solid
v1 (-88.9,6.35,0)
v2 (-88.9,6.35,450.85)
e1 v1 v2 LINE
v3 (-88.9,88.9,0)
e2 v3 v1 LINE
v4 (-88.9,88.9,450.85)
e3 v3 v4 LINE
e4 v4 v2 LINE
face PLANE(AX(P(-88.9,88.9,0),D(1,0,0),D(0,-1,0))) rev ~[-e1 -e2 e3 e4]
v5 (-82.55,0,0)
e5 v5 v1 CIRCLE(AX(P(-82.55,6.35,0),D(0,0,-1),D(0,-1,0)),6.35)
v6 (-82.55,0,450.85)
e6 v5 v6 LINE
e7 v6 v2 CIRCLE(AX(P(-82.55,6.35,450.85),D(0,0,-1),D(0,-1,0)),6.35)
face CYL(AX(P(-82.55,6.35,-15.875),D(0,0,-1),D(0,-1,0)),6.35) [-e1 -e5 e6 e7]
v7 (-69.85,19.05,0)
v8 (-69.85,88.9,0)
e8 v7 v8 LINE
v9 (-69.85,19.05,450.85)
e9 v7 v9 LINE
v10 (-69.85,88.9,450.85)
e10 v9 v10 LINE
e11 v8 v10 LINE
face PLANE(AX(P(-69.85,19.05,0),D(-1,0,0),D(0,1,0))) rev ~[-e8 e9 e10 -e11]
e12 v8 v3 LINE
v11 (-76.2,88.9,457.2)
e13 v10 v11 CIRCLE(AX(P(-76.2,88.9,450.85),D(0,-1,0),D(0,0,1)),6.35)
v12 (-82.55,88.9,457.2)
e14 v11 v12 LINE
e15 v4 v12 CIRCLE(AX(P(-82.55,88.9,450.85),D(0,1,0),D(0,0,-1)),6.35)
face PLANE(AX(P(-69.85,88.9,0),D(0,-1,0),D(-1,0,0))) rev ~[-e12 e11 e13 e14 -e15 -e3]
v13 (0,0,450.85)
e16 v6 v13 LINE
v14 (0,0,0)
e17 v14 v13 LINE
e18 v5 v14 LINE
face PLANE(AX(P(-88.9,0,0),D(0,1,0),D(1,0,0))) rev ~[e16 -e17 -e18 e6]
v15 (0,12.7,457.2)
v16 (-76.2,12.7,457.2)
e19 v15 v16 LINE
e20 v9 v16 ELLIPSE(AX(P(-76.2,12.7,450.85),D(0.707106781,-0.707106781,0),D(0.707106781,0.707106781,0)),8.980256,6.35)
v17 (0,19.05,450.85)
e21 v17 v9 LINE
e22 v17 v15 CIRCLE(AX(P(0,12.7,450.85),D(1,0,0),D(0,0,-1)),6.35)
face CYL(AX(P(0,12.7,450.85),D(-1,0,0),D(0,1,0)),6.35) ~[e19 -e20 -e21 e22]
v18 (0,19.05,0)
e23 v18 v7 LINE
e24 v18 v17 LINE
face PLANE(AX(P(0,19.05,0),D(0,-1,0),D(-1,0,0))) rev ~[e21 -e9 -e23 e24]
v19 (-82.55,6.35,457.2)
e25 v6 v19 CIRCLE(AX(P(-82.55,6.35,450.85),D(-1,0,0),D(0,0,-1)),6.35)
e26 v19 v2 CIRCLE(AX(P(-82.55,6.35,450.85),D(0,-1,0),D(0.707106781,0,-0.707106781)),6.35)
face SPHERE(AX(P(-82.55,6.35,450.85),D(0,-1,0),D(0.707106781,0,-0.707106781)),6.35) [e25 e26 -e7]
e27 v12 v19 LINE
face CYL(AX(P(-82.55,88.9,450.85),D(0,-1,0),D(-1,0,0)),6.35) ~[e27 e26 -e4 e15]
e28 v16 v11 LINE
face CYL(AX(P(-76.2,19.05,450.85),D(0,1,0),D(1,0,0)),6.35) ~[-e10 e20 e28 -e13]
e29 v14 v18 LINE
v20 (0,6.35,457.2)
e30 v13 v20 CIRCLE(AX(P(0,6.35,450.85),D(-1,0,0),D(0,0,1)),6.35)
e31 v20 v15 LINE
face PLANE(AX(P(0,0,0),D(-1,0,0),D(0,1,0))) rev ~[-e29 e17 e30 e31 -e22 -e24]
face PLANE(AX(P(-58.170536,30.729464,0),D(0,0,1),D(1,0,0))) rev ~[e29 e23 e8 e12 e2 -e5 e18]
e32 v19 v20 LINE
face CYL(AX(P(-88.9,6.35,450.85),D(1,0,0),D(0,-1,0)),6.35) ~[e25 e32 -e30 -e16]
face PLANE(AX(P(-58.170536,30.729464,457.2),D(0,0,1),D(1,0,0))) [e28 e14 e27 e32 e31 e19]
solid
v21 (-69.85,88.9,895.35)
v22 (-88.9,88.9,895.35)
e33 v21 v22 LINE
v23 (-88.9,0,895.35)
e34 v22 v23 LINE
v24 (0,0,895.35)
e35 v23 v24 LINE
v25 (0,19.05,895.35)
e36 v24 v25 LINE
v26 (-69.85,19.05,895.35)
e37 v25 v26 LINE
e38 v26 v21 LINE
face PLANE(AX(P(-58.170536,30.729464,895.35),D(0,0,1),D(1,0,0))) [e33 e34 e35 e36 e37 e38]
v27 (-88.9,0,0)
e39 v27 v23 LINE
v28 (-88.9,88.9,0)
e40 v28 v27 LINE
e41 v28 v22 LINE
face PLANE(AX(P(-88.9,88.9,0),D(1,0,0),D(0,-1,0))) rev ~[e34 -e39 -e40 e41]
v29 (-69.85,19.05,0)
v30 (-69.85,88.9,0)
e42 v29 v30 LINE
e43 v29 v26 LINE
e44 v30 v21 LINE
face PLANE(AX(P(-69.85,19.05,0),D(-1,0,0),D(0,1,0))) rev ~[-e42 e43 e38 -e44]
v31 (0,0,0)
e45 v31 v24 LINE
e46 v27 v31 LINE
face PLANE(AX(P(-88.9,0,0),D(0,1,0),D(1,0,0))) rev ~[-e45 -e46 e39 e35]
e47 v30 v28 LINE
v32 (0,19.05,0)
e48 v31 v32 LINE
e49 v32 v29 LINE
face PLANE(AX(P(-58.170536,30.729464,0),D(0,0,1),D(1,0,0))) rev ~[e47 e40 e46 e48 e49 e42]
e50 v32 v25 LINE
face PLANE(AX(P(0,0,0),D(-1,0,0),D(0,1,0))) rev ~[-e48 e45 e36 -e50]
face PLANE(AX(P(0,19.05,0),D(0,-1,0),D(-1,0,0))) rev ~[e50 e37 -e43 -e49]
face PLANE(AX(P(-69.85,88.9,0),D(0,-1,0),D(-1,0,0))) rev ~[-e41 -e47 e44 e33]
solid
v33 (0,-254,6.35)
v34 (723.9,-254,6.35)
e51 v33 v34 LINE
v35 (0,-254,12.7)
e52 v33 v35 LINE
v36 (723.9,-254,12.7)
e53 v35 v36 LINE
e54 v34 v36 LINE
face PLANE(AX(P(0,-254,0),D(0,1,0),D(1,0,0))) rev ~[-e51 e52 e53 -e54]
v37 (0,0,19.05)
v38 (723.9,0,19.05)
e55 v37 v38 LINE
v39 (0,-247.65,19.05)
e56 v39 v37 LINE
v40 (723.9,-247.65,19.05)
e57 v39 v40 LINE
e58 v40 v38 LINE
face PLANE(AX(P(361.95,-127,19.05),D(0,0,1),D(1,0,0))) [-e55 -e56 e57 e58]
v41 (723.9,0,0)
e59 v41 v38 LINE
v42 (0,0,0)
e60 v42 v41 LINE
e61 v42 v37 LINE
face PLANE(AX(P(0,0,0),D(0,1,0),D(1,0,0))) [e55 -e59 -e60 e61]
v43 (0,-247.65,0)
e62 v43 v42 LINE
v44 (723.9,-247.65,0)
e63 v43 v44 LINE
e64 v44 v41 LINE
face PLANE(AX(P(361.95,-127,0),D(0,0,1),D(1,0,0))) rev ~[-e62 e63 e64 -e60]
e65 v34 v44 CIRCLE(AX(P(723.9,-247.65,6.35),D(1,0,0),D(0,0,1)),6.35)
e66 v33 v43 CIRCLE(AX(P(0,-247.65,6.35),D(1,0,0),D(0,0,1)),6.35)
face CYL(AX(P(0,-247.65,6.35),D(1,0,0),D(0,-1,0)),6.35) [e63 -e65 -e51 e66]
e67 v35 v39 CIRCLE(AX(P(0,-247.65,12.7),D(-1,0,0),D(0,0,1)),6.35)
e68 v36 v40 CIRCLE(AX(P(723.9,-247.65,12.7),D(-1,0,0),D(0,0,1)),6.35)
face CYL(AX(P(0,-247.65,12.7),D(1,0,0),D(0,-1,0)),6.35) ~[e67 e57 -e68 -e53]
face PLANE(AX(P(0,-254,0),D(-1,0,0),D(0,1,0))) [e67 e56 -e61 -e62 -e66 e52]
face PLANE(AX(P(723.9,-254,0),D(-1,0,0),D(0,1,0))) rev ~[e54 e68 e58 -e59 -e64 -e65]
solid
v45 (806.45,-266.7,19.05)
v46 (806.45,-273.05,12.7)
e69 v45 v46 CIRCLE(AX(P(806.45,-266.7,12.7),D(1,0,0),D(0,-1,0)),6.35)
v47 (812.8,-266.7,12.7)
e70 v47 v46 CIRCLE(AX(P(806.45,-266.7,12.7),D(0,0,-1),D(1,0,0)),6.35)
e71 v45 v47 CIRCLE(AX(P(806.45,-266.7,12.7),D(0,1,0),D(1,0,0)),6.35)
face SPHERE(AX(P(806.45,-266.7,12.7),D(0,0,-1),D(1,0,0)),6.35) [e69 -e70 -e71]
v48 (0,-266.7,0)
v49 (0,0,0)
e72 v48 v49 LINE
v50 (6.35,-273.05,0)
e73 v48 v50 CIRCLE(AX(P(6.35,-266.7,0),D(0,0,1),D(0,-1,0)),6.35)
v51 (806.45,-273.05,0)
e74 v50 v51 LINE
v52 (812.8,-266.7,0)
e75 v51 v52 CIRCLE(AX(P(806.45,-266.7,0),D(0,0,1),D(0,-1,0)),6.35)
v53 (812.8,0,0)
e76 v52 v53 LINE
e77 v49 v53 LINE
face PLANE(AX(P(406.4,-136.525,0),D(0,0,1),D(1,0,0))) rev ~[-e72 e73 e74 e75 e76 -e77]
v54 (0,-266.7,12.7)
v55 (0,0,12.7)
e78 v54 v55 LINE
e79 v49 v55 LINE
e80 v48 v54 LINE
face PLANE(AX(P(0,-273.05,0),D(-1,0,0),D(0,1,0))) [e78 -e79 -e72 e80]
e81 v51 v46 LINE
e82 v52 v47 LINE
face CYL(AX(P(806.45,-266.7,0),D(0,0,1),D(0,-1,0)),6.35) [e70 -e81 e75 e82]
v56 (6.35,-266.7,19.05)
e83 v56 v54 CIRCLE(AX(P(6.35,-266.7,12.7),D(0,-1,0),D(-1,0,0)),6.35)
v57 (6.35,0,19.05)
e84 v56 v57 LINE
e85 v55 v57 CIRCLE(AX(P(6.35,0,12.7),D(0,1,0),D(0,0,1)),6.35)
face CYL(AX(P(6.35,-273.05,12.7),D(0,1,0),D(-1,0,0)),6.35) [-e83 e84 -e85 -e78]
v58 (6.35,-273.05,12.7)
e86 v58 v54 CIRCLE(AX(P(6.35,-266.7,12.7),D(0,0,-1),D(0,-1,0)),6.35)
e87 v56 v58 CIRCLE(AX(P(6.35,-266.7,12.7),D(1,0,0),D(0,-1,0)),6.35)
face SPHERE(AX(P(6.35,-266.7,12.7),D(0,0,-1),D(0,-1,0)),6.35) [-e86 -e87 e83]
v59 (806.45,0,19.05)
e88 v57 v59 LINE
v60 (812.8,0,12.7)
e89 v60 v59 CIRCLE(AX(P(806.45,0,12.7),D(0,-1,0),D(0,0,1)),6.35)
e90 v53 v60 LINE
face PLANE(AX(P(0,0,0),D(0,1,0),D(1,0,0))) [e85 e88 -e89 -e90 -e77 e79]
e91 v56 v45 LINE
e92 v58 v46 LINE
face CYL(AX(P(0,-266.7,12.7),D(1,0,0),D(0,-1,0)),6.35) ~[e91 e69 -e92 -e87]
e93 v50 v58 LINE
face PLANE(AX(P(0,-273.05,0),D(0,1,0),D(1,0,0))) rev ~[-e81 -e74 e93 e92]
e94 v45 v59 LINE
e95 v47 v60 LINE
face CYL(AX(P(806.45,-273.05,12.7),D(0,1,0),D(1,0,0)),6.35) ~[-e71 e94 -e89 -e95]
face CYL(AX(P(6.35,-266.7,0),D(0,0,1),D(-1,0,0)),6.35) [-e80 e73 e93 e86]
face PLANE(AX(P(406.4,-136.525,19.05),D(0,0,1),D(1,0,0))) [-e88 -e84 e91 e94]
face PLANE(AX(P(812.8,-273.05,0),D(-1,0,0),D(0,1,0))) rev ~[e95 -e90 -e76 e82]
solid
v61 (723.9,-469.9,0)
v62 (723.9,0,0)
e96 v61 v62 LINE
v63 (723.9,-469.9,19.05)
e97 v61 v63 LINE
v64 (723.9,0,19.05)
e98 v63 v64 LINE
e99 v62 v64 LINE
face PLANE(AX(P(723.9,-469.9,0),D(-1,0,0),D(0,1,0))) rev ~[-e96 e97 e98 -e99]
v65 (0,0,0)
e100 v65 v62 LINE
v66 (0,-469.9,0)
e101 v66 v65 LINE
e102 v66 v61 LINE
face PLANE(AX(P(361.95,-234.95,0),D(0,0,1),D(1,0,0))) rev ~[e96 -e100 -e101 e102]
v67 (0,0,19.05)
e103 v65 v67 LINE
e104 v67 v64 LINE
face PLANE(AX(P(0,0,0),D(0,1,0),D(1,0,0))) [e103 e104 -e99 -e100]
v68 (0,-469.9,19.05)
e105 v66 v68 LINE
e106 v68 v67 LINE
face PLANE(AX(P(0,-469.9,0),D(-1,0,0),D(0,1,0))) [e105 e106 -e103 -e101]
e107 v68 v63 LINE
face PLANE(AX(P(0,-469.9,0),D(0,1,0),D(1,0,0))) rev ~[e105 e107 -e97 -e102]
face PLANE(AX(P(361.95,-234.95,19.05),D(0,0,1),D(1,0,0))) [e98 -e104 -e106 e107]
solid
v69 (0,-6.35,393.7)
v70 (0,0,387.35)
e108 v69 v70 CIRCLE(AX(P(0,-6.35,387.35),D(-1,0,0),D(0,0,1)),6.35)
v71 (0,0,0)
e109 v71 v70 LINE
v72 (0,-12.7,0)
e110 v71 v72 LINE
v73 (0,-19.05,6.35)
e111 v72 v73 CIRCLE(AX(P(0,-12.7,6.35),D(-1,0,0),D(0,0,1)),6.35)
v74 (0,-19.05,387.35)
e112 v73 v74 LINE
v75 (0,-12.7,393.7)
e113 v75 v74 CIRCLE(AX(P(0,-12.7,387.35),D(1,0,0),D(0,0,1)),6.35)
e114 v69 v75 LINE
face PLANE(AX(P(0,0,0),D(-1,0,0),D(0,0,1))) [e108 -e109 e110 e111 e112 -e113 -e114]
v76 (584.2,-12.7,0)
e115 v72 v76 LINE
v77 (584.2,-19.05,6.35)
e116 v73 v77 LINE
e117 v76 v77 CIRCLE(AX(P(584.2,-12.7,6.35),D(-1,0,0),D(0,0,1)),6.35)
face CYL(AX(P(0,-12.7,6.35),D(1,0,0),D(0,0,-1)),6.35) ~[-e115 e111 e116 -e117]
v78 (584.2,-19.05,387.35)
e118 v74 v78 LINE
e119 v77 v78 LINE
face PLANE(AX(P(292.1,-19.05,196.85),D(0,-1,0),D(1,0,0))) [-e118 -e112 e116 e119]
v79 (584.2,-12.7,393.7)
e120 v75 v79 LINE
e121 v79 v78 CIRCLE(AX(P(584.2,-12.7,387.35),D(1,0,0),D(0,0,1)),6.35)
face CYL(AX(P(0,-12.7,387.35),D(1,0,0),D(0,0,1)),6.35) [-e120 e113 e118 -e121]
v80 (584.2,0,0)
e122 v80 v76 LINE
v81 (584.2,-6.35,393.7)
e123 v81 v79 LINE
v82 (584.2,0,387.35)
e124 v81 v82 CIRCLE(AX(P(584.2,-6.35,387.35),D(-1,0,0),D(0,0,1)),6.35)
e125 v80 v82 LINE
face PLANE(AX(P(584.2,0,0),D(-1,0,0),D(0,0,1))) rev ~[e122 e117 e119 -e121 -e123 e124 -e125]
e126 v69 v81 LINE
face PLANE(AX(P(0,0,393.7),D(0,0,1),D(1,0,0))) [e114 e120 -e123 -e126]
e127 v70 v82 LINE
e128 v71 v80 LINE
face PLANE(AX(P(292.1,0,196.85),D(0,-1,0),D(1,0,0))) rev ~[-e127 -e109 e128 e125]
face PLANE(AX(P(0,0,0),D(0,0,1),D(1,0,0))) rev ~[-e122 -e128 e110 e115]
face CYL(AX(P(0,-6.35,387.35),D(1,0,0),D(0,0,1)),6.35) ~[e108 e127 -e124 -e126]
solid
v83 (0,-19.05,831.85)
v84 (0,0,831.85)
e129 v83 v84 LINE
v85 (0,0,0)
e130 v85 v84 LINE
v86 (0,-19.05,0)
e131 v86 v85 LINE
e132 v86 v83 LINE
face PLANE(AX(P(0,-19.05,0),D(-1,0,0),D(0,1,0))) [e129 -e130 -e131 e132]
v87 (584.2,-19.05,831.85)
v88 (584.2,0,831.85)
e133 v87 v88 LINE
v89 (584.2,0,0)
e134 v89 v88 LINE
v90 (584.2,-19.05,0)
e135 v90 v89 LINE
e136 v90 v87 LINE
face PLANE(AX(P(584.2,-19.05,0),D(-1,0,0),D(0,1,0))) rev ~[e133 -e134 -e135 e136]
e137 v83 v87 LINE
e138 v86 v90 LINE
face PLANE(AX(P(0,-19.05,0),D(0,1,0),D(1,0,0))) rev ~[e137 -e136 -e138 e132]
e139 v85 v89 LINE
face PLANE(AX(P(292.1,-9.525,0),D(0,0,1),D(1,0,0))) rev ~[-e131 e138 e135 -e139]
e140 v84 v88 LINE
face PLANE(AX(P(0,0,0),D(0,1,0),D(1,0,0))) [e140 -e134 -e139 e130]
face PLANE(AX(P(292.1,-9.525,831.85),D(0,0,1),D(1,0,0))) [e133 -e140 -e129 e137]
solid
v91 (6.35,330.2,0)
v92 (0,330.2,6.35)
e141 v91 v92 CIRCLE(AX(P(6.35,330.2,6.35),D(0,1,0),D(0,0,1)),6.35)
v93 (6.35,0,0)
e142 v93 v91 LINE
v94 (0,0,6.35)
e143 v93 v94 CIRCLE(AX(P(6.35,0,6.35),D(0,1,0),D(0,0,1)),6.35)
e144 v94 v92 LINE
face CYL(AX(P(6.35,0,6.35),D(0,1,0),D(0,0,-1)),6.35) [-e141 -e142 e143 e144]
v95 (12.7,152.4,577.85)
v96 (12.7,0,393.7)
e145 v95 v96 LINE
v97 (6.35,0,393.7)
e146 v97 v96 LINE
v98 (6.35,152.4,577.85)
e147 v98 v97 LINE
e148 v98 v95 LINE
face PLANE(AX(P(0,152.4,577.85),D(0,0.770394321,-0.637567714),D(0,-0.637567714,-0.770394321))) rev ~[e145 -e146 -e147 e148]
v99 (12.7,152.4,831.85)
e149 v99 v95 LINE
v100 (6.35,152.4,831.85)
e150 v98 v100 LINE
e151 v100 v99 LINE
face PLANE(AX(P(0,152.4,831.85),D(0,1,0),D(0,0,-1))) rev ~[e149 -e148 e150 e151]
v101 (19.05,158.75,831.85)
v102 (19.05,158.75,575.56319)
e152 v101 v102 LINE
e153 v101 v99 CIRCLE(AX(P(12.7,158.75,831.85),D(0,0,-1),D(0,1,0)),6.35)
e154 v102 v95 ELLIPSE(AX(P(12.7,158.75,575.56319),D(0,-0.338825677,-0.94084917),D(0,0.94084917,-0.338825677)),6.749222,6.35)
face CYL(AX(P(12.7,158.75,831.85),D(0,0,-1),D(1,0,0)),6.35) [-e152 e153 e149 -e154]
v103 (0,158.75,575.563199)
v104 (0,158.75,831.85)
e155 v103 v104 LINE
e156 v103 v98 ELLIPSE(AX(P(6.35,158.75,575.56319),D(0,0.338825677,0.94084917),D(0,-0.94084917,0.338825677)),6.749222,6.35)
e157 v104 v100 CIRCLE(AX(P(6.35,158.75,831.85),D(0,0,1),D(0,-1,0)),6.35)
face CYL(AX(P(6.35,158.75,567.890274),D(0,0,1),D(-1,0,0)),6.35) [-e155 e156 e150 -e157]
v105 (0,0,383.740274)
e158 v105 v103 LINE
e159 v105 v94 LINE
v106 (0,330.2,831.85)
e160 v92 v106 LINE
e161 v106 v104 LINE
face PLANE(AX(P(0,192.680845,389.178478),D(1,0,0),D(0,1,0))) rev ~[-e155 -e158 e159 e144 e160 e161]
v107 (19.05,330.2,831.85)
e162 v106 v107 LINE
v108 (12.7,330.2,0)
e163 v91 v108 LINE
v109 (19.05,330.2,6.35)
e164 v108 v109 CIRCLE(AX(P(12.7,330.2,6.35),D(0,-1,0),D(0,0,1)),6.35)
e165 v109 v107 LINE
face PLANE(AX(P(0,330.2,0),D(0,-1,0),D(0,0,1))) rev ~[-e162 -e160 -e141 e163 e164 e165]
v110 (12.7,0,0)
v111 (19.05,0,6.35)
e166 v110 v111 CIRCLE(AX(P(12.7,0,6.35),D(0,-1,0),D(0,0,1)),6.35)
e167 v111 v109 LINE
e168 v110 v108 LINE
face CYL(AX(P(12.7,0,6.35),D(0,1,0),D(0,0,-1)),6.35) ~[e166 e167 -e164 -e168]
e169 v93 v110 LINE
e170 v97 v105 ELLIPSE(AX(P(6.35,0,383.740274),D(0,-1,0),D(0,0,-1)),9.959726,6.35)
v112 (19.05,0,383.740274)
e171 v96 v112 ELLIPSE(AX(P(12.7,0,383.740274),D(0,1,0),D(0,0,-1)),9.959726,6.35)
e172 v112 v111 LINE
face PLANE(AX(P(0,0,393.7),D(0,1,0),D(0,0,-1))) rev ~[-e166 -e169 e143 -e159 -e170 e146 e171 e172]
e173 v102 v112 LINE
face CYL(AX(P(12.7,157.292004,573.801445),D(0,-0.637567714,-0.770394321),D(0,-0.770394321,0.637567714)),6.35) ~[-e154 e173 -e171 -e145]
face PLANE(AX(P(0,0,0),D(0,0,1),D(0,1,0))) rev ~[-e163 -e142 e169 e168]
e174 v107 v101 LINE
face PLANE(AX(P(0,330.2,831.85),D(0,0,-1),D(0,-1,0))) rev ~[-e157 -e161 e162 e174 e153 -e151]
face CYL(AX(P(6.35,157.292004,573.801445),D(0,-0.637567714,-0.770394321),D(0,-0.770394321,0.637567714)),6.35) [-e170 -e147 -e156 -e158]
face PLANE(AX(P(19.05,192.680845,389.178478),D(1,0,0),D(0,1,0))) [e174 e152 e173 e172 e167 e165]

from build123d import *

# Parameters (mm, degrees)
F0_W         = 584.2
F0_H         = 19.05
F1_DEPTH     = 831.85
F2_W         = 723.9
F2_H         = 469.9
F3_DEPTH     = 19.05
F4_W         = 723.9
F4_H         = 254
F5_DEPTH     = 19.05
F6_W         = 812.8
F6_H         = 273.05
F7_DEPTH     = 19.05
F9_DEPTH     = 457.2
F11_DEPTH    = 895.35
F14_DEPTH    = 19.05
F15_DEPTH    = 19.05
F16_W        = 584.2
F16_H        = 393.7
F17_DEPTH    = 19.05
F18_R        = 6.35
F19_R        = 6.35
F20_R        = 6.35
F21_R        = 6.35
F22_R        = 6.35
F23_R        = 6.35
F24_R        = 6.35
F25_T1_DEPTH = 466.725
F25_S5_W     = 6.35
F25_S5_H     = 6.35
F25_T6_DEPTH = 6.35


# Not quite as in the source:
# - a fillet or chamfer that OpenCascade refuses, or shapes differently, is made with other operations: its cross-section is extruded or revolved along the edge and cut away or added


with BuildPart() as f1:
    # F0 (on Top) → F1 (new body)
    with BuildSketch(Plane.XY):
        with Locations((292.1, -9.525)):
            Rectangle(F0_W, F0_H)
    extrude(amount=F1_DEPTH)


with BuildPart() as f3:
    # F2 (on Top) → F3 (new body)
    with BuildSketch(Plane.XY):
        with Locations((361.95, -234.95)):
            Rectangle(F2_W, F2_H)
    extrude(amount=F3_DEPTH)


with BuildPart() as f5:
    # F4 (on Top) → F5 (new body)
    with BuildSketch(Plane.XY):
        with Locations((361.95, -127)):
            Rectangle(F4_W, F4_H)
    extrude(amount=F5_DEPTH)

    # F22
    f22_edges = [f5.edges().sort_by_distance(p)[0] for p in [
        (361.95, -254, 19.05),
        (361.95, -254, 0),
    ]]
    fillet(f22_edges, radius=F22_R)


with BuildPart() as f7:
    # F6 (on Top) → F7 (new body)
    with BuildSketch(Plane.XY):
        with Locations((406.4, -136.525)):
            Rectangle(F6_W, F6_H)
    extrude(amount=F7_DEPTH)

    # F18
    f18_edges = [f7.edges().sort_by_distance(p)[0] for p in [
        (0, -273.05, 9.525),
        (812.8, -273.05, 9.525),
        (812.8, -136.525, 19.05),
        (406.4, -273.05, 19.05),
        (0, -136.525, 19.05),
    ]]
    fillet(f18_edges, radius=F18_R)


with BuildPart() as f9:
    # F8 (on Top) → F9 (new body)
    with BuildSketch(Plane.XY):
        Polygon((-88.9, 0), (0, 0), (0, 19.05), (-69.85, 19.05), (-69.85, 88.9), (-88.9, 88.9), align=None)
    extrude(amount=F9_DEPTH)

    # F20
    f20_edges = [f9.edges().sort_by_distance(p)[0] for p in [
        (-44.45, 0, 457.2),
        (-88.9, 44.45, 457.2),
        (-69.85, 53.975, 457.2),
        (-34.925, 19.05, 457.2),
    ]]
    fillet(f20_edges, radius=F20_R)

    # F25: fillet of radius 6.35 on 2 edges, made by hand

    # F25_s2 → F25_t1 (cut)
    with BuildSketch(Plane.XY.offset(-15.875)):
        with BuildLine():
            ThreePointArc((-82.55, 0), (-87.0401280605, 1.8598719395), (-88.9, 6.35))
            Line((-88.9, 6.35), (-88.9, 0))
            Line((-88.9, 0), (-82.55, 0))
        make_face()
    extrude(amount=F25_T1_DEPTH, mode=Mode.SUBTRACT)


with BuildPart() as f11:
    # F10 (on Top) → F11 (new body)
    with BuildSketch(Plane.XY):
        Polygon((-88.9, 0), (0, 0), (0, 19.05), (-69.85, 19.05), (-69.85, 88.9), (-88.9, 88.9), (-88.9, 19.05), align=None)
    extrude(amount=F11_DEPTH)


with BuildPart() as f14:
    # F12 (on Right) → F14 (new body)
    with BuildSketch(Plane.YZ):
        Polygon((551.983873911, 795.822240965), (177.333873911, 421.172240965), (177.333873911, 295.44865527), (551.983873911, 670.09865527), align=None)
    extrude(amount=F14_DEPTH)


with BuildPart() as f15:
    # F13 (on Right) → F15 (new body)
    with BuildSketch(Plane.YZ):
        Polygon((0, 393.7), (0, 0), (330.2, 0), (330.2, 831.85), (152.4, 831.85), (152.4, 577.85), align=None)
    extrude(amount=F15_DEPTH)

    # F21
    f21_edges = [f15.edges().sort_by_distance(p)[0] for p in [
        (19.05, 76.2, 485.775),
        (0, 76.2, 485.775),
    ]]
    fillet(f21_edges, radius=F21_R)

    # F23
    f23_edges = [f15.edges().sort_by_distance(p)[0] for p in [
        (19.05, 165.1, 0),
        (0, 165.1, 0),
    ]]
    fillet(f23_edges, radius=F23_R)

    # F24
    f24_edges = [f15.edges().sort_by_distance(p)[0] for p in [
        (19.05, 152.4, 704.85),
        (0, 152.4, 704.85),
    ]]
    fillet(f24_edges, radius=F24_R)


with BuildPart() as f17:
    # F16 (on Front) → F17 (new body)
    with BuildSketch(Plane.XZ):
        with Locations((292.1, 196.85)):
            Rectangle(F16_W, F16_H)
    extrude(amount=F17_DEPTH)

    # F19
    f19_edges = [f17.edges().sort_by_distance(p)[0] for p in [
        (292.1, -19.05, 393.7),
        (292.1, 0, 393.7),
        (292.1, -19.05, 0),
    ]]
    fillet(f19_edges, radius=F19_R)


with BuildPart() as f25_tool4:
    # F25_s5 → F25_t6 (new body)
    with BuildSketch(Plane.XZ.offset(-6.35)):
        with Locations((-85.725, 454.025)):
            Rectangle(F25_S5_W, F25_S5_H)
    extrude(amount=F25_T6_DEPTH)

    # F25_s7 → F25_t8 (revolve, cut)
    with BuildSketch(Plane(origin=(-82.55, 6.35, 450.85), x_dir=(0.7071067812, 0, -0.7071067812), z_dir=(-0.7071067812, 0, -0.7071067812))):
        with BuildLine():
            ThreePointArc((0, -6.35), (6.35, 0), (0, 6.35))
            Line((0, 6.35), (0, -6.35))
        make_face()
    revolve(axis=Axis((-82.55, 6.35, 450.85), (0, -1, 0)), mode=Mode.SUBTRACT)


with BuildPart() as f9_1:
    add(f9.part)

    # F25_t3: cut F25_tool4
    add(f25_tool4.part, mode=Mode.SUBTRACT)


solid = Compound([f1.part, f3.part, f5.part, f7.part, f11.part, f15.part, f17.part, f9_1.part])
